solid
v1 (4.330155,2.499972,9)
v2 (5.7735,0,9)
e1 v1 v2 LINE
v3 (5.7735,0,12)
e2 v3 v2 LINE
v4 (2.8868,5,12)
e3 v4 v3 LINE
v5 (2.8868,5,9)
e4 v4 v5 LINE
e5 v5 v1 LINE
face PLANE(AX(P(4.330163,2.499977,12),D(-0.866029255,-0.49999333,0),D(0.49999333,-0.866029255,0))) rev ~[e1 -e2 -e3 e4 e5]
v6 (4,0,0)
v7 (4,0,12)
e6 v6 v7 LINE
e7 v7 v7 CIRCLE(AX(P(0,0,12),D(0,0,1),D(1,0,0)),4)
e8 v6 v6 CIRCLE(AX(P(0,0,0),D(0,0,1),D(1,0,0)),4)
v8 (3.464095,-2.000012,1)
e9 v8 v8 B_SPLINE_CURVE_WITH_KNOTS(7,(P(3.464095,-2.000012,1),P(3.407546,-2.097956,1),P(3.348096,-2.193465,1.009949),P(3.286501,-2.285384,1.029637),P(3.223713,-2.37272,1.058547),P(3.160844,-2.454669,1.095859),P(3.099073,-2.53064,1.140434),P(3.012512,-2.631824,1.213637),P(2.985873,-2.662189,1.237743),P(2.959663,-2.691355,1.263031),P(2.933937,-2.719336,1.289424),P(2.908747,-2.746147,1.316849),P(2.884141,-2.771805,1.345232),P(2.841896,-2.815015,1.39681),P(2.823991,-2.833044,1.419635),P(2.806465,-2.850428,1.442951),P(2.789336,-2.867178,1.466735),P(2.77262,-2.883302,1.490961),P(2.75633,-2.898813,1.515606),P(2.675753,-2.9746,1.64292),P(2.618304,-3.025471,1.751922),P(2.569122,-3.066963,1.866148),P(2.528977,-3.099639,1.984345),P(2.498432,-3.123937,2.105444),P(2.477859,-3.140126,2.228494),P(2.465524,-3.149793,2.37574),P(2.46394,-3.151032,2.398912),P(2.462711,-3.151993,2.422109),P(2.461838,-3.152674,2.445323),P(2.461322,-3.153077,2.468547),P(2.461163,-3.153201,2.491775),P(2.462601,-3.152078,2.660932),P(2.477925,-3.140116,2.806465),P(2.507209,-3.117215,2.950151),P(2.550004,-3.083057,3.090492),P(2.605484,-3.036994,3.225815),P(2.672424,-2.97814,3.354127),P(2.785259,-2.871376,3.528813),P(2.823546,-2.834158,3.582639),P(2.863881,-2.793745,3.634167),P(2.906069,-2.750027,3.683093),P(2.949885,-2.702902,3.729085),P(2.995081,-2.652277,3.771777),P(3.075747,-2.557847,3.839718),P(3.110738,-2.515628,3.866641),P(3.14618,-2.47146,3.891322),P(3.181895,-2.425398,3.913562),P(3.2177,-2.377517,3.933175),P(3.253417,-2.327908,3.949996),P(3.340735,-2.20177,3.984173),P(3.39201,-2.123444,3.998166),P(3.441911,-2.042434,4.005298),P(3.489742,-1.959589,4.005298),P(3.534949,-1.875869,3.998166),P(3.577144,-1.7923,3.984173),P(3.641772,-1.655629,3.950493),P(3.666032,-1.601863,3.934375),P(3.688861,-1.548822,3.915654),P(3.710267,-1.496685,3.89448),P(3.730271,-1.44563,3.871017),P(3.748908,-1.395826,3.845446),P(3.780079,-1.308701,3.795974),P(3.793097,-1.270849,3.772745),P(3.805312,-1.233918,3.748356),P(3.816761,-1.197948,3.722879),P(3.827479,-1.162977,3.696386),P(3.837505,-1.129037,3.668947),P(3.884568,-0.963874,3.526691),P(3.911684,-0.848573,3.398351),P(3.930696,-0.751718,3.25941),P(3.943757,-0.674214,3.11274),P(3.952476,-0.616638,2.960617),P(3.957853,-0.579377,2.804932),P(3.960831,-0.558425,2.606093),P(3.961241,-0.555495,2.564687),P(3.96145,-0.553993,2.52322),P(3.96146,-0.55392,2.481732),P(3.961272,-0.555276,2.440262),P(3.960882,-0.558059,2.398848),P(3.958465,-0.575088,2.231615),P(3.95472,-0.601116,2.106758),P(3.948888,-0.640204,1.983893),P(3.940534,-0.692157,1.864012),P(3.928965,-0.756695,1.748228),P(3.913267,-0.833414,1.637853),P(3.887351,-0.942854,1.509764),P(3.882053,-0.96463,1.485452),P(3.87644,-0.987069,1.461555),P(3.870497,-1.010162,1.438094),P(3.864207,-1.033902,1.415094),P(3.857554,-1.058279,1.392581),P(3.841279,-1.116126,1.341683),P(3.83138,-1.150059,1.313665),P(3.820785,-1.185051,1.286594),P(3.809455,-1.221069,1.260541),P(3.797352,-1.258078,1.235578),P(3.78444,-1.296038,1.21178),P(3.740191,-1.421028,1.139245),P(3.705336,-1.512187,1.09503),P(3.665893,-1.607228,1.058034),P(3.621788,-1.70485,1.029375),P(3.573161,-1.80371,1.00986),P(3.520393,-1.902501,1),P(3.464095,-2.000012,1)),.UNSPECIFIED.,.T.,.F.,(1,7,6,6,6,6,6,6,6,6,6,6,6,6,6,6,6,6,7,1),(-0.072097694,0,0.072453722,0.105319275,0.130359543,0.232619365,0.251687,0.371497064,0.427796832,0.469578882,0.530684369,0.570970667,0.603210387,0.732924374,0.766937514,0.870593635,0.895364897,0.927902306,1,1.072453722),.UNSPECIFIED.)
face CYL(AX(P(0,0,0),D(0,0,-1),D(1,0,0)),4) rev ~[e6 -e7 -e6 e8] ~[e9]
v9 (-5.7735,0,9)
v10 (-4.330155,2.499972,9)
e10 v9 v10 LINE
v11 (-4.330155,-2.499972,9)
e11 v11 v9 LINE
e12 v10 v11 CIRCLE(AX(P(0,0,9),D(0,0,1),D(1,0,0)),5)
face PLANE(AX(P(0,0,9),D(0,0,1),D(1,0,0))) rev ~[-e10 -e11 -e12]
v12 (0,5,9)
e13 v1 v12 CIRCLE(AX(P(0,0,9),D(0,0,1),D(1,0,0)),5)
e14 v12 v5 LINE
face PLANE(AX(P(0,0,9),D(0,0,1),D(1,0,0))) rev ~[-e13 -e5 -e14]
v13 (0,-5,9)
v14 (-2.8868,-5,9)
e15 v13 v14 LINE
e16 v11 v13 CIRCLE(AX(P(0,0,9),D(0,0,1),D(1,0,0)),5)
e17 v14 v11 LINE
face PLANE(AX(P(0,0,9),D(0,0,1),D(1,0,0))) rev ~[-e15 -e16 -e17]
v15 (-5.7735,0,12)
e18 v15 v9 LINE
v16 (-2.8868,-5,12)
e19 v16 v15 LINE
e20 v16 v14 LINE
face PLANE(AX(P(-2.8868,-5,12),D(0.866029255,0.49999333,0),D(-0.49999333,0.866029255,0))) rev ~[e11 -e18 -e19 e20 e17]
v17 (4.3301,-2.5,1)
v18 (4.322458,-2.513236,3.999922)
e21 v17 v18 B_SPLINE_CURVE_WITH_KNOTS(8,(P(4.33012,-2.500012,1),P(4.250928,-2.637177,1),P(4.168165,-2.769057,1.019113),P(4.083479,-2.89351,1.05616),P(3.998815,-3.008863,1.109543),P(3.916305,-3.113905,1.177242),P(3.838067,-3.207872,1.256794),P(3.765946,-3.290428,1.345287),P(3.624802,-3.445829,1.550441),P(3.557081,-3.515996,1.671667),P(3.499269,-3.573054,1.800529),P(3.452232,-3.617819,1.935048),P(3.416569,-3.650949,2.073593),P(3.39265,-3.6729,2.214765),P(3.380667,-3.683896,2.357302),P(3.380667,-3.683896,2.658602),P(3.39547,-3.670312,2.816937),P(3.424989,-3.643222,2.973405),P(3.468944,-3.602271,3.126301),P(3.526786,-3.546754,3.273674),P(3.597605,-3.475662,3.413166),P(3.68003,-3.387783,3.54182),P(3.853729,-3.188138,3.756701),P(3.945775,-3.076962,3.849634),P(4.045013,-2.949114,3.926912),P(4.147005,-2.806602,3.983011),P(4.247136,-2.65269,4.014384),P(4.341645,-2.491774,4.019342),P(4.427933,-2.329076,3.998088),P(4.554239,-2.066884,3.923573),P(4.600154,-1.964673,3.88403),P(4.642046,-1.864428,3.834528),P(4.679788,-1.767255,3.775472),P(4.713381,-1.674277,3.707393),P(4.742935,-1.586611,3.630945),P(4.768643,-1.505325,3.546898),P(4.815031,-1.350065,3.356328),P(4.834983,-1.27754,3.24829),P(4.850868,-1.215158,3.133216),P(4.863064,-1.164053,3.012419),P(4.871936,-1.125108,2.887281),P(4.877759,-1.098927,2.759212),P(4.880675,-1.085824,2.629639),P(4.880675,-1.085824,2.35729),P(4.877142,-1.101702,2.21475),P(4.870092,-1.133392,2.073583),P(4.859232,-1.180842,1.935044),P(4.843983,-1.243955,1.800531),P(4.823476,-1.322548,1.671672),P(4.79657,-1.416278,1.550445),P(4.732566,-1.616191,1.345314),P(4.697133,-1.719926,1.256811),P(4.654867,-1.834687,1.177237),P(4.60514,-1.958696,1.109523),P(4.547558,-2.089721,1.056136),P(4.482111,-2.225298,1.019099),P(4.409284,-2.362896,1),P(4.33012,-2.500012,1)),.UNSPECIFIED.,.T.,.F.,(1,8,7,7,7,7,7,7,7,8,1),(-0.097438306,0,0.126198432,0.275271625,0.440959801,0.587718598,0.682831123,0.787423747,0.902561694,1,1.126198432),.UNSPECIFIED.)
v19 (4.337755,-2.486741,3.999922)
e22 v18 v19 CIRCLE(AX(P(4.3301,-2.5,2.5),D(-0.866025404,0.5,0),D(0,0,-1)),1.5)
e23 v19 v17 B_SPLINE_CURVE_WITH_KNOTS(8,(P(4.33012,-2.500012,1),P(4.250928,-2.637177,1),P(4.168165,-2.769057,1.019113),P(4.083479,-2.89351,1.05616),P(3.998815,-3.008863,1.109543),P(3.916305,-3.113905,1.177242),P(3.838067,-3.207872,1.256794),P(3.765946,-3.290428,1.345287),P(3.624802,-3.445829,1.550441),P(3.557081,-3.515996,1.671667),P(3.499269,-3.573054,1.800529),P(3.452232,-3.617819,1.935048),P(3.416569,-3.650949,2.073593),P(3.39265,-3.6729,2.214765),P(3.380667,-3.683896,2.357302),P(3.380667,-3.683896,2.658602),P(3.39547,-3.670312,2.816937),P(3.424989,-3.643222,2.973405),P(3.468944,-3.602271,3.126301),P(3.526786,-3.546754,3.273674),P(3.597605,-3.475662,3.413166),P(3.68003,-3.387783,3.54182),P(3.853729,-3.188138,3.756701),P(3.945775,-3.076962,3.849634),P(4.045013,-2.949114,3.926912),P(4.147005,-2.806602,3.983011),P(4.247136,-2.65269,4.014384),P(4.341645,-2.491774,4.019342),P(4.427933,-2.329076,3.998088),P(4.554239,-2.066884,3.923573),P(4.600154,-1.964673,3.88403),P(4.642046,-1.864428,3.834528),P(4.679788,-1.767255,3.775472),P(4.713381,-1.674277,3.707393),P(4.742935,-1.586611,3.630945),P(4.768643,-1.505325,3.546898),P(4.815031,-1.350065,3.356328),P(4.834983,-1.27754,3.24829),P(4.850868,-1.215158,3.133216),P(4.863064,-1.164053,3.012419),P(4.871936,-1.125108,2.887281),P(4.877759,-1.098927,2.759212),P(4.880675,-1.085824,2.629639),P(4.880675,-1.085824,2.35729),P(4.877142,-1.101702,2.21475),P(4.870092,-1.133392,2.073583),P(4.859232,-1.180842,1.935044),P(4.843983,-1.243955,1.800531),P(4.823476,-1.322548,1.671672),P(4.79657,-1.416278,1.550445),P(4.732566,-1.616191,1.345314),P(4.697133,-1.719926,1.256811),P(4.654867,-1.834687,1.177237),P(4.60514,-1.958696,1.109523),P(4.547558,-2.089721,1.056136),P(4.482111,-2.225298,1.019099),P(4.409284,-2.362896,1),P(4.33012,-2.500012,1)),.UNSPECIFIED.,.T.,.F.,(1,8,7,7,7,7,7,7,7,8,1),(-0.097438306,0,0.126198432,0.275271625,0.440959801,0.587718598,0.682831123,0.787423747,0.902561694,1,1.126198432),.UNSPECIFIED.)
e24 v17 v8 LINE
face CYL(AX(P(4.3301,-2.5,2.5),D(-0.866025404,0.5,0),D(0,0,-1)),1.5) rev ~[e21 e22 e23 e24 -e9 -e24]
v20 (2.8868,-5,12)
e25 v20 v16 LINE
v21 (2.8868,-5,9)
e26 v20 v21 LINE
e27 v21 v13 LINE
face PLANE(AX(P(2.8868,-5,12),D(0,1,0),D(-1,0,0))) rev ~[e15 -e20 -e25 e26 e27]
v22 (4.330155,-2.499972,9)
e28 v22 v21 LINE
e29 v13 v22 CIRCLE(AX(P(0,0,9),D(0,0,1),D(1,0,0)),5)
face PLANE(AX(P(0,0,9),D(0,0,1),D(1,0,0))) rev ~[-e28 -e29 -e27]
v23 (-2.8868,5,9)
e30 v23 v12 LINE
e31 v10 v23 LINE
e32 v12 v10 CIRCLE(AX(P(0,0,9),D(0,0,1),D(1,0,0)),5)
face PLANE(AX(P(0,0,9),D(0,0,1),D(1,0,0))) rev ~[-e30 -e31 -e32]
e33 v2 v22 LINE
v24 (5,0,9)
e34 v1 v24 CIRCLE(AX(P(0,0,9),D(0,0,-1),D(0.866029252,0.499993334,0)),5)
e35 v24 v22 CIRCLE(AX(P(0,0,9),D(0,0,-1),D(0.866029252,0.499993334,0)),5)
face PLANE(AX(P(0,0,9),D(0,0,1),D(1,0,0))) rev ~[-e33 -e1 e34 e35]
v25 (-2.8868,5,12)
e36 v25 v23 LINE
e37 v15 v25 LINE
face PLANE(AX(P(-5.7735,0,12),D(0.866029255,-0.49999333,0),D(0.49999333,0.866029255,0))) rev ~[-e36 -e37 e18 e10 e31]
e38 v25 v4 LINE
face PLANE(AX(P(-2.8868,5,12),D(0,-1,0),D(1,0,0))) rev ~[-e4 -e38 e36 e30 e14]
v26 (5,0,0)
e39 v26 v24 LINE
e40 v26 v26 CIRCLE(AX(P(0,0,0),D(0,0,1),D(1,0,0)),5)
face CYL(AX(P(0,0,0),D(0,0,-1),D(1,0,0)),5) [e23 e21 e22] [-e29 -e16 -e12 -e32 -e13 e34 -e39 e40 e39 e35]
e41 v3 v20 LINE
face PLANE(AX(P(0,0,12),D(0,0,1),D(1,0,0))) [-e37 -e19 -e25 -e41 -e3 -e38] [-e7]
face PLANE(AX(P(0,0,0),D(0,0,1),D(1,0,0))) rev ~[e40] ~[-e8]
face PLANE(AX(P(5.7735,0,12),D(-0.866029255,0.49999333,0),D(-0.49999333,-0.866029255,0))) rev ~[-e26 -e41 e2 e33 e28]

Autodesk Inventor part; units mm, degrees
ref_plane "YZ Plane" through (0, 0, 0) normal (1, 0, 0) x (0, 1, 0)
ref_plane "XZ Plane" through (0, 0, 0) normal (0, 1, 0) x (-1, 0, 0)
ref_plane "XY Plane" through (0, 0, 0) normal (0, 0, 1) x (1, 0, 0)
sketch "Skizze1" plane through (0, 0, 0) normal (0, 0, 1) x (1, 0, 0)
  circle A0 centre (0, 0) radius 5
  circle A1 centre (0, 0) radius 4
  dimension "d0" = 8
  dimension "d1" = 10
extrude "Extrusion1" add sketch "Skizze1" along normal blind 12
sketch "Skizze2" plane through (0, 0, 12) normal (0, 0, 1) x (1, 0, 0)
  circle A0 centre (0, 0) radius 5 projected
  line L0 (-2.8868, 5) -> (2.8868, 5)
  line L1 (2.8868, 5) -> (5.7735, 0)
  line L2 (5.7735, 0) -> (2.8868, -5)
  line L3 (2.8868, -5) -> (-2.8868, -5)
  line L4 (-2.8868, -5) -> (-5.7735, 0)
  line L5 (-5.7735, 0) -> (-2.8868, 5)
extrude "Extrusion2" add sketch "Skizze2" against normal blind 3 contours A0 L1 L2 | A0 L0 L1 | L2 L3 A0 | A0 L5 L0 | L3 L4 A0 | A0 L4 L5
sketch "Skizze3" plane through (5.7735, 0, 12) normal (0.8660254, -0.5, 0) x (0, 0, -1)
  line L0 (0, 0) -> (0, -5.7735) projected
  line L1 (0, -2.8868) -> (12, -2.8868) construction
  point P0 (9.5, -2.8868)
  dimension "d6" = 2.5
hole "Bohrung1" at (4.3301, -2.5, 2.5) direction (-0.8660254, 0.5, 0) diameter 3 depth 4 tip angle 118
properties part number "messingnut" material "Messing, weicher Gelbton"
